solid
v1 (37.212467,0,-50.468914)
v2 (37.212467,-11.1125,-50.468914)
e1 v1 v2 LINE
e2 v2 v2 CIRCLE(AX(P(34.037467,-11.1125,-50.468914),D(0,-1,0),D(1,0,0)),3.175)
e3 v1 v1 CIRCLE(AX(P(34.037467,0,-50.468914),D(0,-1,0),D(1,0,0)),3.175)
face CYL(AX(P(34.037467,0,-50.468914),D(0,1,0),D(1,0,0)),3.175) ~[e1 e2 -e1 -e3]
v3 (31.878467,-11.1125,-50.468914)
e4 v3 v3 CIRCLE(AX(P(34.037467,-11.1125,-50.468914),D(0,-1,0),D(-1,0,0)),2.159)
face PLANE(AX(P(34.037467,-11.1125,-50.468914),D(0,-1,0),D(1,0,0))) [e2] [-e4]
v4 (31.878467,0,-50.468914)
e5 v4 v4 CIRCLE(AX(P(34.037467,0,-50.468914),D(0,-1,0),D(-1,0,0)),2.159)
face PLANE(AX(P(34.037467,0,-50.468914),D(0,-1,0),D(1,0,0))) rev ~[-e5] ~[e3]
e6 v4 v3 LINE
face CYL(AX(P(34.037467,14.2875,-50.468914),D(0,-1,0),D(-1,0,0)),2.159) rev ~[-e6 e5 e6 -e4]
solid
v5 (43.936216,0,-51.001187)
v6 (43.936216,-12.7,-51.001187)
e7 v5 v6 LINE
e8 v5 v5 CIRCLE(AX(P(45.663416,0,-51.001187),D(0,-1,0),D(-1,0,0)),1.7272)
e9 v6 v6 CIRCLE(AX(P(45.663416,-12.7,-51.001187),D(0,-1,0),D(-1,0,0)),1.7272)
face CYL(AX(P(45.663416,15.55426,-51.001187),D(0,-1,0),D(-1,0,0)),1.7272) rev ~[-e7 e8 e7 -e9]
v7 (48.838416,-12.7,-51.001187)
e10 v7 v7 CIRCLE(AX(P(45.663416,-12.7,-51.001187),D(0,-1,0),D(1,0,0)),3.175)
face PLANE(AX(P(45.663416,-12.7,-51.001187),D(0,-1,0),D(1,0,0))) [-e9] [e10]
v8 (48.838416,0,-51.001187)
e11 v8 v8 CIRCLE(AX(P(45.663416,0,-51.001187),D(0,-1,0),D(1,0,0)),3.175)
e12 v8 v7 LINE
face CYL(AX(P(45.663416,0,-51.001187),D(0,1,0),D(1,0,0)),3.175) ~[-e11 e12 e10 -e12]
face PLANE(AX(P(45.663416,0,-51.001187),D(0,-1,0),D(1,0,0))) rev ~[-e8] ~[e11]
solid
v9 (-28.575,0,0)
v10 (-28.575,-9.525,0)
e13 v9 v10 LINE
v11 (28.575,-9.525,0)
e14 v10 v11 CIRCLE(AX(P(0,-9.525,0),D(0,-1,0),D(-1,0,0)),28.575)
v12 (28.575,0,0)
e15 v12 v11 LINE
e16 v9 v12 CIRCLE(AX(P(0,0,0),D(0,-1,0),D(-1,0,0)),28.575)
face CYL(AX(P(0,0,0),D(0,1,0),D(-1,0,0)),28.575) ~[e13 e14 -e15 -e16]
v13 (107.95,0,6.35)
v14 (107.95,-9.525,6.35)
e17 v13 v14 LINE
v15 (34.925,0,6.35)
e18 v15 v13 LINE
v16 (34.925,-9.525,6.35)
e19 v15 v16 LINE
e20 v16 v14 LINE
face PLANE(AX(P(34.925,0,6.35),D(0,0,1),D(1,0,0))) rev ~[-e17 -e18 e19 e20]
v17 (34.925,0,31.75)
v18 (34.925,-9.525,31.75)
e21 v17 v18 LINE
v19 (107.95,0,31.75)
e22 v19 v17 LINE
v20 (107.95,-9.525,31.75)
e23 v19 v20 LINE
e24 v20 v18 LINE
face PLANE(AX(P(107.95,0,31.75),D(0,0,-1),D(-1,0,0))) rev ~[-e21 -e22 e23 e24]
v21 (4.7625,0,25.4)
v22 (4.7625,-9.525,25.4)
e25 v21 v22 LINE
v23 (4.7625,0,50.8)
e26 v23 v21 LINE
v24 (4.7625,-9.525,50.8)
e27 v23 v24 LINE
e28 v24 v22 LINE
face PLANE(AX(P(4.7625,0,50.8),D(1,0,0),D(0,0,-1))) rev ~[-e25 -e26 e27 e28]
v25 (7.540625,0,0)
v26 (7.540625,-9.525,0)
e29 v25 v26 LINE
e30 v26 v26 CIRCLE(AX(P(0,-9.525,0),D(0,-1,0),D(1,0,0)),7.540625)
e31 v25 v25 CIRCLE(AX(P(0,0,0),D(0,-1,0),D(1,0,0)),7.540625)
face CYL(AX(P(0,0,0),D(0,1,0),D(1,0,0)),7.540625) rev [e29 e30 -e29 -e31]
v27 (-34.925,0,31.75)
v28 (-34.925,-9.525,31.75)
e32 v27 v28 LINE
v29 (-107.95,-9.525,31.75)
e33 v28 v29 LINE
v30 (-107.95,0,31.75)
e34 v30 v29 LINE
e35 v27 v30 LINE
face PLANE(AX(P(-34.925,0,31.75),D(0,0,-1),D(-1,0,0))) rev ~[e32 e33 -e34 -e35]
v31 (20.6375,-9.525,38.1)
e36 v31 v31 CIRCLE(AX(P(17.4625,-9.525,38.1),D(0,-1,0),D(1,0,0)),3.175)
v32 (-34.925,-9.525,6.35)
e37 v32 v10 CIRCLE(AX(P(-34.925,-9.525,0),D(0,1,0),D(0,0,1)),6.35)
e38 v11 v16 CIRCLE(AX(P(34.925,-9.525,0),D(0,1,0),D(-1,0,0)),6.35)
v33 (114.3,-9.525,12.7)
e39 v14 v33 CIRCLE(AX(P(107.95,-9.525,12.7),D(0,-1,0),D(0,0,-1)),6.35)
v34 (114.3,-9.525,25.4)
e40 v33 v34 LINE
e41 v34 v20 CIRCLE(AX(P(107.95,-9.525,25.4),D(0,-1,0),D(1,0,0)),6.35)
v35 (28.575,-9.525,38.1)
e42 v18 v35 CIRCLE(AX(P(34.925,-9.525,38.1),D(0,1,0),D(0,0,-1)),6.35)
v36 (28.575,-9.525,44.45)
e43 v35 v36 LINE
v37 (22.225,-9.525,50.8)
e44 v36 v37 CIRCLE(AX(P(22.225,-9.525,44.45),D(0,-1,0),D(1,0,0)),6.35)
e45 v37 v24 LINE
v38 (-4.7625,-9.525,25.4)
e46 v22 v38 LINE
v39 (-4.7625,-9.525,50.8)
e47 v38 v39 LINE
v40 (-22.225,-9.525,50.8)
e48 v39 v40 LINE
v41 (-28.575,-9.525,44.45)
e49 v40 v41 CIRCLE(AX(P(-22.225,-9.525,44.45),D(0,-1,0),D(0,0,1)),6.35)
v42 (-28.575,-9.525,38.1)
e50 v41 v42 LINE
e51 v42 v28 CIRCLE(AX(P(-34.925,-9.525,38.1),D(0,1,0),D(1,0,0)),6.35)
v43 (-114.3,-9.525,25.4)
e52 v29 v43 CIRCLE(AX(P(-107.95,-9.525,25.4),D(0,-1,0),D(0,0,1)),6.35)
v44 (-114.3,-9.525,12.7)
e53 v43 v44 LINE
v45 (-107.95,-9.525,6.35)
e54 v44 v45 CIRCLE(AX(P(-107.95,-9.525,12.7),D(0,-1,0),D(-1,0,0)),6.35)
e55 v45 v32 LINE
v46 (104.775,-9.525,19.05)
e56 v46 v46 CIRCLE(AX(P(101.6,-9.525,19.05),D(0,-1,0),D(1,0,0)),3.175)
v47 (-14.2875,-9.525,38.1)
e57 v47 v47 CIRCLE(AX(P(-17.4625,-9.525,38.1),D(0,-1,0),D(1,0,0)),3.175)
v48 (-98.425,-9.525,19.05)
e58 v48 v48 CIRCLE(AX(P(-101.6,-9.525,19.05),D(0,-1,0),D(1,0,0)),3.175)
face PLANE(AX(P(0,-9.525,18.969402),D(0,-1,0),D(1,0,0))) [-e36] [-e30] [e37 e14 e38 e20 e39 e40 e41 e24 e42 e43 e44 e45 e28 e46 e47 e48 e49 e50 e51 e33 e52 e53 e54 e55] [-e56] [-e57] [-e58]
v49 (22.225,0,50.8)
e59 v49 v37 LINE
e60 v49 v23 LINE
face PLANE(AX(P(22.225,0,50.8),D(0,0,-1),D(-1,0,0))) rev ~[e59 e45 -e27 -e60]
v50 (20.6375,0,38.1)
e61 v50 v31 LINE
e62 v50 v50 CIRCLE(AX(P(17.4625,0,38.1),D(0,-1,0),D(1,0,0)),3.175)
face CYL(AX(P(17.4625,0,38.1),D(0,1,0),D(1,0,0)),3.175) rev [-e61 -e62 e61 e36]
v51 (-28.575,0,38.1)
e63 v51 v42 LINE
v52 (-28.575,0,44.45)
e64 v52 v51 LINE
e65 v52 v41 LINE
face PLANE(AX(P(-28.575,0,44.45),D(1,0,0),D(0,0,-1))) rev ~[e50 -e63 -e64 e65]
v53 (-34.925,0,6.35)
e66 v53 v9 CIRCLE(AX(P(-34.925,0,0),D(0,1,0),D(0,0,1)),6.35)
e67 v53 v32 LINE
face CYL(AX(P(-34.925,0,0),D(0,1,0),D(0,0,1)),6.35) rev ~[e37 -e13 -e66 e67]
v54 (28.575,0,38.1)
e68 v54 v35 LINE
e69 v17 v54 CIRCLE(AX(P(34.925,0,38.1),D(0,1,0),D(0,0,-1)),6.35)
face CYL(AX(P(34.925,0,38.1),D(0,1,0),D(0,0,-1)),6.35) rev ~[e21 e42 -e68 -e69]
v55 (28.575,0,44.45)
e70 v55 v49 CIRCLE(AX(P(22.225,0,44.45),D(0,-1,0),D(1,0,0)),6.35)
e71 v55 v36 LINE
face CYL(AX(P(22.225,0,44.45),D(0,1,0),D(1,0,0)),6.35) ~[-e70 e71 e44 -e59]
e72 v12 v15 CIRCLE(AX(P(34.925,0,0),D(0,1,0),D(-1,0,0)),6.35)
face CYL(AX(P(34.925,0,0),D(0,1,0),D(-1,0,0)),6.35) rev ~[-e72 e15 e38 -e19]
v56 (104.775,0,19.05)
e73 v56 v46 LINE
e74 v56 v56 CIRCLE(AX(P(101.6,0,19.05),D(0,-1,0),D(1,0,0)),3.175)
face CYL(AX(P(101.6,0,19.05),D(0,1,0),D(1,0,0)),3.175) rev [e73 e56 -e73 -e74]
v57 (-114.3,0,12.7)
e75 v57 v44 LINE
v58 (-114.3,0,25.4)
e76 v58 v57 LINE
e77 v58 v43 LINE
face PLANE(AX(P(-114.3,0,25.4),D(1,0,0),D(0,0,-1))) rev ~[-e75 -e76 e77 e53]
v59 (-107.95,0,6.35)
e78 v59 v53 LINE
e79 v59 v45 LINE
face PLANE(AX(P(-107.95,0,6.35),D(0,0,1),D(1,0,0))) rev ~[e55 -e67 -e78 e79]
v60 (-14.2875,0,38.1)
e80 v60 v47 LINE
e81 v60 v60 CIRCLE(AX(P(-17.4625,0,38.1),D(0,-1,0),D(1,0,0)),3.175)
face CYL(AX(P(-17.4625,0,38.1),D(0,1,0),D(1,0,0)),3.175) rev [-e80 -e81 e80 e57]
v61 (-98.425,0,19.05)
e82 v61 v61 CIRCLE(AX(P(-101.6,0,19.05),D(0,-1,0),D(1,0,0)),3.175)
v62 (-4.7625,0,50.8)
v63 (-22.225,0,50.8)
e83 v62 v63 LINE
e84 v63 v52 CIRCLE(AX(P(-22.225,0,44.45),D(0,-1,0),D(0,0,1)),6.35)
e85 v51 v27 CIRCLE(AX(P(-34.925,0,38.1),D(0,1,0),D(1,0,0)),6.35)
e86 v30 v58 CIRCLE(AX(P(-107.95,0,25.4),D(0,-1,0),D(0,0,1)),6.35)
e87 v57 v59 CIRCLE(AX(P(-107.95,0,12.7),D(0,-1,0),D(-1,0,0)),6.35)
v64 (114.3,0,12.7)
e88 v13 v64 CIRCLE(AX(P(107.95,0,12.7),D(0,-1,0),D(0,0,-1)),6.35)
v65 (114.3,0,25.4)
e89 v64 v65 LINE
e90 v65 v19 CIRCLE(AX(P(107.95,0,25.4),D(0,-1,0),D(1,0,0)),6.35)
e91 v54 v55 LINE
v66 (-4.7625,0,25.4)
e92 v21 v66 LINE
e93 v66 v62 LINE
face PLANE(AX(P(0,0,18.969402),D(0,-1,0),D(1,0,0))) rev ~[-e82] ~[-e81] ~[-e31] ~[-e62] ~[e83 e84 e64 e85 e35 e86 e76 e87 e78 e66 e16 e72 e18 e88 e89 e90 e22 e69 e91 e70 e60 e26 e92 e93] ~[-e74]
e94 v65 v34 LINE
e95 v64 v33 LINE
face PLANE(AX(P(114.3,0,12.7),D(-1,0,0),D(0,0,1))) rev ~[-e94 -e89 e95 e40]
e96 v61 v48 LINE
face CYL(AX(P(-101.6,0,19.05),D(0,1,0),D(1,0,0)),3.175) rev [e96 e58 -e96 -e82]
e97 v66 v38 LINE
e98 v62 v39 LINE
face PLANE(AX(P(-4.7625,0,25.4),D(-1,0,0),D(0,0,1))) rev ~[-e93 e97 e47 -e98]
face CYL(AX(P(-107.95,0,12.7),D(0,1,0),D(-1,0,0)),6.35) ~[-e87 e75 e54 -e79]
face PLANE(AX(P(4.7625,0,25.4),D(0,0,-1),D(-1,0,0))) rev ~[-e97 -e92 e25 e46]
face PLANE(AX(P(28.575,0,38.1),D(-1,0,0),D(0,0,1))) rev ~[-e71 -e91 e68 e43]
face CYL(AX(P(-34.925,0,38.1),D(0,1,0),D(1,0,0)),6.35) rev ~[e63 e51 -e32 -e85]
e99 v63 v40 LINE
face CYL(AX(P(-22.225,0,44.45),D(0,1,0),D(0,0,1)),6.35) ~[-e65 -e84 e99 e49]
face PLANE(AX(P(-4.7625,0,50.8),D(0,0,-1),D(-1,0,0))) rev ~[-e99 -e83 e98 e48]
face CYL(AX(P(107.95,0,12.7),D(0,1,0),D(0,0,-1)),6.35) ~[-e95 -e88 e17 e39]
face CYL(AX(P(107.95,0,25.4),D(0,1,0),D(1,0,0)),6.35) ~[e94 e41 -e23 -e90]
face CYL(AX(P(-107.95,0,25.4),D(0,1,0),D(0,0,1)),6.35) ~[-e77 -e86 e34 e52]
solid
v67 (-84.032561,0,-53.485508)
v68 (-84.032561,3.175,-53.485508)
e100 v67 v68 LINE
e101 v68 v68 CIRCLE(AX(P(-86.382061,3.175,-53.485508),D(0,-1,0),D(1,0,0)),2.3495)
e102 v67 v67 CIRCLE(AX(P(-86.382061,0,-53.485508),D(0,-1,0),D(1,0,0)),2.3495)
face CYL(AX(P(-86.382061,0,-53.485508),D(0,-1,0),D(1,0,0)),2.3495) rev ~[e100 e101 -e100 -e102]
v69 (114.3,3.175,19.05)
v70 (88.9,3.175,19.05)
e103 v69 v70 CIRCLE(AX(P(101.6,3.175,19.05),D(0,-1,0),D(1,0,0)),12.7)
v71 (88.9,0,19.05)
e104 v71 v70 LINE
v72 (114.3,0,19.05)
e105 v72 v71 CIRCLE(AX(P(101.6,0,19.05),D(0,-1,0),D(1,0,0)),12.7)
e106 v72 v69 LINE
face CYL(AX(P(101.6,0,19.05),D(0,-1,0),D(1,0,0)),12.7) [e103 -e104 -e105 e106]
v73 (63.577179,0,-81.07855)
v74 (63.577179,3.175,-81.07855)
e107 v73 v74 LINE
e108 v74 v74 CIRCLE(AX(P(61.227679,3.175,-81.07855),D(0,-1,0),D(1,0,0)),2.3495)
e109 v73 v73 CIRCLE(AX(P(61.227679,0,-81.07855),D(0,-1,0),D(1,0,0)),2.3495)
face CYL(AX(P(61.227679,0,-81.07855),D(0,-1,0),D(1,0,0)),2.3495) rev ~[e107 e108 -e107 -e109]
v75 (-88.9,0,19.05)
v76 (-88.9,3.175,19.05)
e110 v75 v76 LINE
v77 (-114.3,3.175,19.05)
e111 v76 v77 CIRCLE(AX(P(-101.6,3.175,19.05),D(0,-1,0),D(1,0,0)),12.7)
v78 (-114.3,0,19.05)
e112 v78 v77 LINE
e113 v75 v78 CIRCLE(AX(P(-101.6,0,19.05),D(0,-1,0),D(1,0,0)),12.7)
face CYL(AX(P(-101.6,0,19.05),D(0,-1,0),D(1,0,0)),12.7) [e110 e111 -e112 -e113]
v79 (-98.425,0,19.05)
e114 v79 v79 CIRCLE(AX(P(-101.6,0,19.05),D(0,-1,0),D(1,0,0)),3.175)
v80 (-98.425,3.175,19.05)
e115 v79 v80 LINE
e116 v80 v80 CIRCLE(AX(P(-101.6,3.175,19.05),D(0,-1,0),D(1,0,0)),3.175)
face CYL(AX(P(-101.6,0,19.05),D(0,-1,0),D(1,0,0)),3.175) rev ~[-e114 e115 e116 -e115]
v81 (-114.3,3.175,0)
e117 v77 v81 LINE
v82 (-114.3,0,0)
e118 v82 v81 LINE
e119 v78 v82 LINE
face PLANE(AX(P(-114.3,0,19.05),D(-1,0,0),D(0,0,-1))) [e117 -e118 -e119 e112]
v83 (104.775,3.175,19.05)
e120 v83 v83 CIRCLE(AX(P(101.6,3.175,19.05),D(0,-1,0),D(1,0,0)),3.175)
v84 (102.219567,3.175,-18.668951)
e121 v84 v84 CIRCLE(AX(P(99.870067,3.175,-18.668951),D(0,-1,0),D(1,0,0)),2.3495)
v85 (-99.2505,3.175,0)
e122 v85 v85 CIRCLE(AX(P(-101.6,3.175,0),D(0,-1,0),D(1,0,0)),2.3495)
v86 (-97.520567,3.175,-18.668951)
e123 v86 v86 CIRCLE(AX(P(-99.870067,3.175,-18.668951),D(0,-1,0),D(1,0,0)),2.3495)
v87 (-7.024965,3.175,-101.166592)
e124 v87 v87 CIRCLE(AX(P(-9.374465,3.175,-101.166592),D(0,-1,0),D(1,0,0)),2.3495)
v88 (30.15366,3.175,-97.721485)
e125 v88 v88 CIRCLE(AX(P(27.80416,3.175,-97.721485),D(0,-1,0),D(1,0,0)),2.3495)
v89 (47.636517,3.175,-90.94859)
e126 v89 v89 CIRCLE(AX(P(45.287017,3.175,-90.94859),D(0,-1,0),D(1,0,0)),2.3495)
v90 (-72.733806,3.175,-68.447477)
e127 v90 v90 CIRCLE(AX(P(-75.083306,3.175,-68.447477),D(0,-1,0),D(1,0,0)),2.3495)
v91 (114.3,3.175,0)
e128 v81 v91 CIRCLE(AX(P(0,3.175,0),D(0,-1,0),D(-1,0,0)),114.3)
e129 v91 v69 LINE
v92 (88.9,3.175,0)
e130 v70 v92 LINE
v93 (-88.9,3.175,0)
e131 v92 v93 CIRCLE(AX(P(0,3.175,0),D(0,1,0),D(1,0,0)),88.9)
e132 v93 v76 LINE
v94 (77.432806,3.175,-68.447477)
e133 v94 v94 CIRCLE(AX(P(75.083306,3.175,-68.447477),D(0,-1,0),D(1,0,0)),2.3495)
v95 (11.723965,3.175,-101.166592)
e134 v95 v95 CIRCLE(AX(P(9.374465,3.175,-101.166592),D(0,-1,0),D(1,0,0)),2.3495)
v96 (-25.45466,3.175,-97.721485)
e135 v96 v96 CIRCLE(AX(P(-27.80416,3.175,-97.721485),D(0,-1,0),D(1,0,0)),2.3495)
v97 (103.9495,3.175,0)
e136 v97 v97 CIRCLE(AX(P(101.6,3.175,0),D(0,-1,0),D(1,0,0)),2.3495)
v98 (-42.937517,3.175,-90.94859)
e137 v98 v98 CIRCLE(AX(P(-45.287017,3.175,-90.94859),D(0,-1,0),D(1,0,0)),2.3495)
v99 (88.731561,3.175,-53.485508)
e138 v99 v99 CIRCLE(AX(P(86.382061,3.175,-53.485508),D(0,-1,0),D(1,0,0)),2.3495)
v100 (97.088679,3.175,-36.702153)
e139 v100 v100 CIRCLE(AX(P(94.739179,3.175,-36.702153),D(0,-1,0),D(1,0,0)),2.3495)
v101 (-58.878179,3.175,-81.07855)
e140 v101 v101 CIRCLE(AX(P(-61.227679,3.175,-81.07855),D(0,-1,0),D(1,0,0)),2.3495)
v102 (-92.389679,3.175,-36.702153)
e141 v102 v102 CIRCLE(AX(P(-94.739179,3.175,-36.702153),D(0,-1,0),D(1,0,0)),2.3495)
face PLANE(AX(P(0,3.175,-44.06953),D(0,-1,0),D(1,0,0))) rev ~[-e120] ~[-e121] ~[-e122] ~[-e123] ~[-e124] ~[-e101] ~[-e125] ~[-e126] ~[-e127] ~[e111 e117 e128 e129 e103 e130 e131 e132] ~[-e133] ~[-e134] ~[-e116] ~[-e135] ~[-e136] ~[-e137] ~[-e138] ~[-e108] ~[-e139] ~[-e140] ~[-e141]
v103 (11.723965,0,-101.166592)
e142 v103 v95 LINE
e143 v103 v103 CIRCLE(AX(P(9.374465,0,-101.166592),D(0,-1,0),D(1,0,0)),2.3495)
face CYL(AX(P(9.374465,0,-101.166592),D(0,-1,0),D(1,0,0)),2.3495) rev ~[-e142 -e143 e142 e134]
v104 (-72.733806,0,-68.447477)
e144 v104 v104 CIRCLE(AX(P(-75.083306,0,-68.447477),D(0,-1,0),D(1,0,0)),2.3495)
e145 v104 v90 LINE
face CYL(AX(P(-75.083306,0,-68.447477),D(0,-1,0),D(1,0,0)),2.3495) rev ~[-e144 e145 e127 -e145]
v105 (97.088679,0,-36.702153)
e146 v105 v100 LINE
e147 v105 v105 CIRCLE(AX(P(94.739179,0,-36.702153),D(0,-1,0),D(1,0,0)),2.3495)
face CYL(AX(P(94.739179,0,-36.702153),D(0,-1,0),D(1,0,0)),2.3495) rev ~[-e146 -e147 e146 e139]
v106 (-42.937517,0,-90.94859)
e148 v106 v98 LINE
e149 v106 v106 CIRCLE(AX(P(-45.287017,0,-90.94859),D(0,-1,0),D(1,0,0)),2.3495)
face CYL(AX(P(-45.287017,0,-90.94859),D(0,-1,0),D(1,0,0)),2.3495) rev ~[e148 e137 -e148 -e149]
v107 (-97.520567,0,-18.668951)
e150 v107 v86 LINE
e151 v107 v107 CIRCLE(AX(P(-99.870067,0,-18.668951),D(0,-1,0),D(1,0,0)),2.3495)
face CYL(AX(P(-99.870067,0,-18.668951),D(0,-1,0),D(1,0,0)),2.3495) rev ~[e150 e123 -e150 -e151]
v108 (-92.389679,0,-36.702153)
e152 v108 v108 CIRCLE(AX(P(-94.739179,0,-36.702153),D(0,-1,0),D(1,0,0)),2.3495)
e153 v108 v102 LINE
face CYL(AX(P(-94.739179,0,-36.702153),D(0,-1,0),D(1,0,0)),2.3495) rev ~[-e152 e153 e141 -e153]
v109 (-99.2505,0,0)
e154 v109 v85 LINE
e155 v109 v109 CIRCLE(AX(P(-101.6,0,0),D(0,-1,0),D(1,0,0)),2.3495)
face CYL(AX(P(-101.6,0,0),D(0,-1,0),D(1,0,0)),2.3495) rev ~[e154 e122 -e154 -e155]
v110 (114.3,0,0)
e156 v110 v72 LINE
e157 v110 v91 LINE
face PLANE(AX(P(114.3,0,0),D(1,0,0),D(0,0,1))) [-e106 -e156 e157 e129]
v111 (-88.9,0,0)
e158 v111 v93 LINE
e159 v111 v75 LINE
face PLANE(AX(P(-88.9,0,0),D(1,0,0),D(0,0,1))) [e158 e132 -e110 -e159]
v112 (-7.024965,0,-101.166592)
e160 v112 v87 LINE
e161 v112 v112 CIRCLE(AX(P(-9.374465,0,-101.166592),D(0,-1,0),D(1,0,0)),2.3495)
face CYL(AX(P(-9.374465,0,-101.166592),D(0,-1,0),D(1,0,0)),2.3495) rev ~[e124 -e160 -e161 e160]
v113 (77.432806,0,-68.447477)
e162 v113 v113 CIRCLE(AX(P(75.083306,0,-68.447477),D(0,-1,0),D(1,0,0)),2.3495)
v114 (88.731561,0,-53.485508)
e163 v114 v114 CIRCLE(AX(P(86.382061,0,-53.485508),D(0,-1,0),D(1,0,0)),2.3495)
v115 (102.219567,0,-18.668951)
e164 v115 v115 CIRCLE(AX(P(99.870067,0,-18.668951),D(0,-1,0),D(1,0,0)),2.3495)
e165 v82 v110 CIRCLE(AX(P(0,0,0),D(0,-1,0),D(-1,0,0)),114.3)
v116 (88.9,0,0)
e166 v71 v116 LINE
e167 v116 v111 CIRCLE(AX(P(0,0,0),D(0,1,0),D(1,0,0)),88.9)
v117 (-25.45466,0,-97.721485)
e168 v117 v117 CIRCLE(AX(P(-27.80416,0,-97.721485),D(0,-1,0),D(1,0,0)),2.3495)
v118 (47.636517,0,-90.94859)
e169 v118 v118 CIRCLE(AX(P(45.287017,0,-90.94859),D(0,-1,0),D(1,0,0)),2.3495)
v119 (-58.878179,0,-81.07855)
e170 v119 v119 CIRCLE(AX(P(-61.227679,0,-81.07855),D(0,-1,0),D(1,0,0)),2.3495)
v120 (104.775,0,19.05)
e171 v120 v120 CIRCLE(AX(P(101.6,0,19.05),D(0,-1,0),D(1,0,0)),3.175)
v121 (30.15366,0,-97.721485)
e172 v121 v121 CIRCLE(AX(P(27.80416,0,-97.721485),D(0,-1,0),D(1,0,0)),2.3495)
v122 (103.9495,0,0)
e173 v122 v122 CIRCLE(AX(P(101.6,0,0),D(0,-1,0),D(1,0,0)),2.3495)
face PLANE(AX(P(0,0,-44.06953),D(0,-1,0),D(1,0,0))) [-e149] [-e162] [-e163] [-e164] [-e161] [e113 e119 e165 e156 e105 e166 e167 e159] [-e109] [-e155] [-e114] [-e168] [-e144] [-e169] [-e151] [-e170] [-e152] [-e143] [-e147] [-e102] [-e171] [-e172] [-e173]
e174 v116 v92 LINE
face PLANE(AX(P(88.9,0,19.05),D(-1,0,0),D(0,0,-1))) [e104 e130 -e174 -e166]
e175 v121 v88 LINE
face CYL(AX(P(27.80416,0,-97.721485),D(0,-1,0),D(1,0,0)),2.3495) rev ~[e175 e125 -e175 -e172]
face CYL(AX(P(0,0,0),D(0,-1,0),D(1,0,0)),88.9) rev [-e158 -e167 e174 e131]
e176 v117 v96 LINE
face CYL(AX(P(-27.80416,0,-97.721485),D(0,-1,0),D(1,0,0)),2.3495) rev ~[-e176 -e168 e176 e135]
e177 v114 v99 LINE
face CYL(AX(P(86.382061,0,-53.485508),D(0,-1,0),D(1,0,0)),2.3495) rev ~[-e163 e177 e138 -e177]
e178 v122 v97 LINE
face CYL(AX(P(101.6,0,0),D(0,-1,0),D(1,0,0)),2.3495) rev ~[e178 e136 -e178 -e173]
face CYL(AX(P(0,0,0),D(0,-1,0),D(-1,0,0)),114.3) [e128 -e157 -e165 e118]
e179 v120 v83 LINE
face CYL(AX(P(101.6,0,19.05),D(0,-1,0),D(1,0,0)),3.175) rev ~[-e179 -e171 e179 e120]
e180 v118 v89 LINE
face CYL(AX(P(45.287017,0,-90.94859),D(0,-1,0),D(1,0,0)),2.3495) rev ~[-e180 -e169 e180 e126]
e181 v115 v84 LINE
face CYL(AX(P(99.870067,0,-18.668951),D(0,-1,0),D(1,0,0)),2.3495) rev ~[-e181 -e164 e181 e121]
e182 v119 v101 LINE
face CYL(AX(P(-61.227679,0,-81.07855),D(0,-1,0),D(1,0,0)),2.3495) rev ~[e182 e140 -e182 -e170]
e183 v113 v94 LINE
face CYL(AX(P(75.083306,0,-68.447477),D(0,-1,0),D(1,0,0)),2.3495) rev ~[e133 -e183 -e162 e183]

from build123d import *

# Parameters (mm, degrees)
F1_R     = 7.540625
F1_R_2   = 3.175
F2_DEPTH = 9.525
F0_R     = 2.3495
F0_R_2   = 3.175
F3_DEPTH = 3.175
F4_R     = 3.175
F5_DEPTH = 12.7
F6_DEPTH = 11.1125
F7_D     = 3.4544
F8_D     = 4.318


# Not quite as in the source:
# - a length typed as a fraction of an inch, garbled in the dataset ("3 / 203.2 mm" for 3/8 in), is restored


with BuildPart() as f2:
    # F1 (on Front) → F2 (new body)
    with BuildSketch(Plane.XZ):
        with BuildLine():
            ThreePointArc((-28.575, 0), (0, -28.575), (28.575, 0))
            ThreePointArc((28.575, 0), (30.4348719395, 4.4901280605), (34.925, 6.35))
            Line((34.925, 6.35), (107.95, 6.35))
            ThreePointArc((107.95, 6.35), (112.4401280605, 8.2098719395), (114.3, 12.7))
            Line((114.3, 12.7), (114.3, 25.4))
            ThreePointArc((114.3, 25.4), (112.4401280605, 29.8901280605), (107.95, 31.75))
            Line((107.95, 31.75), (34.925, 31.75))
            ThreePointArc((34.925, 31.75), (30.4348719395, 33.6098719395), (28.575, 38.1))
            Line((28.575, 38.1), (28.575, 44.45))
            ThreePointArc((28.575, 44.45), (26.7151280605, 48.9401280605), (22.225, 50.8))
            Line((22.225, 50.8), (4.7625, 50.8))
            Line((4.7625, 50.8), (4.7625, 25.4))
            Line((4.7625, 25.4), (-4.7625, 25.4))
            Line((-4.7625, 25.4), (-4.7625, 50.8))
            Line((-4.7625, 50.8), (-22.225, 50.8))
            ThreePointArc((-22.225, 50.8), (-26.7151280605, 48.9401280605), (-28.575, 44.45))
            Line((-28.575, 44.45), (-28.575, 38.1))
            ThreePointArc((-28.575, 38.1), (-30.4348719395, 33.6098719395), (-34.925, 31.75))
            Line((-34.925, 31.75), (-107.95, 31.75))
            ThreePointArc((-107.95, 31.75), (-112.4401280605, 29.8901280605), (-114.3, 25.4))
            Line((-114.3, 25.4), (-114.3, 12.7))
            ThreePointArc((-114.3, 12.7), (-112.4401280605, 8.2098719395), (-107.95, 6.35))
            Line((-107.95, 6.35), (-34.925, 6.35))
            ThreePointArc((-34.925, 6.35), (-30.4348719395, 4.4901280605), (-28.575, 0))
        make_face()
        Circle(F1_R, mode=Mode.SUBTRACT)
        with Locations((-101.6, 19.05)):
            Circle(F1_R_2, mode=Mode.SUBTRACT)
        with Locations((-17.4625, 38.1)):
            Circle(F1_R_2, mode=Mode.SUBTRACT)
        with Locations((101.6, 19.05)):
            Circle(F1_R_2, mode=Mode.SUBTRACT)
        with Locations((17.4625, 38.1)):
            Circle(F1_R_2, mode=Mode.SUBTRACT)
    extrude(amount=F2_DEPTH)


with BuildPart() as f3:
    # F0 (on Front) → F3 (new body)
    with BuildSketch(Plane.XZ):
        with BuildLine():
            Line((-114.3, 19.05), (-114.3, 0))
            ThreePointArc((-114.3, 0), (0, -114.3), (114.3, 0))
            Line((114.3, 0), (114.3, 19.05))
            ThreePointArc((114.3, 19.05), (101.6, 31.75), (88.9, 19.05))
            Line((88.9, 19.05), (88.9, 0))
            ThreePointArc((88.9, 0), (0, -88.9), (-88.9, 0))
            Line((-88.9, 0), (-88.9, 19.05))
            ThreePointArc((-88.9, 19.05), (-101.6, 31.75), (-114.3, 19.05))
        make_face()
        with Locations((-61.2276790561, -81.0785502917)):
            Circle(F0_R, mode=Mode.SUBTRACT)
        with Locations((-27.8041597913, -97.7214853464)):
            Circle(F0_R, mode=Mode.SUBTRACT)
        with Locations((-9.3744653215, -101.1665923116)):
            Circle(F0_R, mode=Mode.SUBTRACT)
        with Locations((-45.2870169469, -90.9485904017)):
            Circle(F0_R, mode=Mode.SUBTRACT)
        with Locations((-75.0833059896, -68.4474773945)):
            Circle(F0_R, mode=Mode.SUBTRACT)
        with Locations((-86.3820609901, -53.4855077483)):
            Circle(F0_R, mode=Mode.SUBTRACT)
        with Locations((9.3744653215, -101.1665923116)):
            Circle(F0_R, mode=Mode.SUBTRACT)
        with Locations((27.8041597913, -97.7214853464)):
            Circle(F0_R, mode=Mode.SUBTRACT)
        with Locations((45.2870169469, -90.9485904017)):
            Circle(F0_R, mode=Mode.SUBTRACT)
        with Locations((61.2276790561, -81.0785502917)):
            Circle(F0_R, mode=Mode.SUBTRACT)
        with Locations((75.0833059896, -68.4474773945)):
            Circle(F0_R, mode=Mode.SUBTRACT)
        with Locations((86.3820609901, -53.4855077483)):
            Circle(F0_R, mode=Mode.SUBTRACT)
        with Locations((-94.7391785075, -36.7021532846)):
            Circle(F0_R, mode=Mode.SUBTRACT)
        with Locations((-99.8700669279, -18.6689510102)):
            Circle(F0_R, mode=Mode.SUBTRACT)
        with Locations((-101.6, 0)):
            Circle(F0_R, mode=Mode.SUBTRACT)
        with Locations((-101.6, 19.05)):
            Circle(F0_R_2, mode=Mode.SUBTRACT)
        with Locations((94.7391785075, -36.7021532846)):
            Circle(F0_R, mode=Mode.SUBTRACT)
        with Locations((99.8700669279, -18.6689510102)):
            Circle(F0_R, mode=Mode.SUBTRACT)
        with Locations((101.6, 0)):
            Circle(F0_R, mode=Mode.SUBTRACT)
        with Locations((101.6, 19.05)):
            Circle(F0_R_2, mode=Mode.SUBTRACT)
    extrude(amount=-F3_DEPTH)


with BuildPart() as f5:
    # F4 (on Front) → F5 (new body)
    with BuildSketch(Plane.XZ):
        with Locations((45.6634163857, -51.0011874139)):
            Circle(F4_R)
    extrude(amount=F5_DEPTH)

    # F7 (through all)
    with Locations(Plane(origin=(0, 0, 0), x_dir=(1, 0, 0), z_dir=(0, 1, 0))):
        with Locations((45.6634163857, 51.0011874139)):
            Hole(F7_D / 2)


with BuildPart() as f6:
    # F4 (on Front) → F6 (new body)
    with BuildSketch(Plane.XZ):
        with Locations((34.0374670923, -50.4689142108)):
            Circle(F4_R)
    extrude(amount=F6_DEPTH)

    # F8 (through all)
    with Locations(Plane(origin=(0, 0, 0), x_dir=(1, 0, 0), z_dir=(0, 1, 0))):
        with Locations((34.0374670923, 50.4689142108)):
            Hole(F8_D / 2)


solid = Compound([f2.part, f3.part, f5.part, f6.part])
